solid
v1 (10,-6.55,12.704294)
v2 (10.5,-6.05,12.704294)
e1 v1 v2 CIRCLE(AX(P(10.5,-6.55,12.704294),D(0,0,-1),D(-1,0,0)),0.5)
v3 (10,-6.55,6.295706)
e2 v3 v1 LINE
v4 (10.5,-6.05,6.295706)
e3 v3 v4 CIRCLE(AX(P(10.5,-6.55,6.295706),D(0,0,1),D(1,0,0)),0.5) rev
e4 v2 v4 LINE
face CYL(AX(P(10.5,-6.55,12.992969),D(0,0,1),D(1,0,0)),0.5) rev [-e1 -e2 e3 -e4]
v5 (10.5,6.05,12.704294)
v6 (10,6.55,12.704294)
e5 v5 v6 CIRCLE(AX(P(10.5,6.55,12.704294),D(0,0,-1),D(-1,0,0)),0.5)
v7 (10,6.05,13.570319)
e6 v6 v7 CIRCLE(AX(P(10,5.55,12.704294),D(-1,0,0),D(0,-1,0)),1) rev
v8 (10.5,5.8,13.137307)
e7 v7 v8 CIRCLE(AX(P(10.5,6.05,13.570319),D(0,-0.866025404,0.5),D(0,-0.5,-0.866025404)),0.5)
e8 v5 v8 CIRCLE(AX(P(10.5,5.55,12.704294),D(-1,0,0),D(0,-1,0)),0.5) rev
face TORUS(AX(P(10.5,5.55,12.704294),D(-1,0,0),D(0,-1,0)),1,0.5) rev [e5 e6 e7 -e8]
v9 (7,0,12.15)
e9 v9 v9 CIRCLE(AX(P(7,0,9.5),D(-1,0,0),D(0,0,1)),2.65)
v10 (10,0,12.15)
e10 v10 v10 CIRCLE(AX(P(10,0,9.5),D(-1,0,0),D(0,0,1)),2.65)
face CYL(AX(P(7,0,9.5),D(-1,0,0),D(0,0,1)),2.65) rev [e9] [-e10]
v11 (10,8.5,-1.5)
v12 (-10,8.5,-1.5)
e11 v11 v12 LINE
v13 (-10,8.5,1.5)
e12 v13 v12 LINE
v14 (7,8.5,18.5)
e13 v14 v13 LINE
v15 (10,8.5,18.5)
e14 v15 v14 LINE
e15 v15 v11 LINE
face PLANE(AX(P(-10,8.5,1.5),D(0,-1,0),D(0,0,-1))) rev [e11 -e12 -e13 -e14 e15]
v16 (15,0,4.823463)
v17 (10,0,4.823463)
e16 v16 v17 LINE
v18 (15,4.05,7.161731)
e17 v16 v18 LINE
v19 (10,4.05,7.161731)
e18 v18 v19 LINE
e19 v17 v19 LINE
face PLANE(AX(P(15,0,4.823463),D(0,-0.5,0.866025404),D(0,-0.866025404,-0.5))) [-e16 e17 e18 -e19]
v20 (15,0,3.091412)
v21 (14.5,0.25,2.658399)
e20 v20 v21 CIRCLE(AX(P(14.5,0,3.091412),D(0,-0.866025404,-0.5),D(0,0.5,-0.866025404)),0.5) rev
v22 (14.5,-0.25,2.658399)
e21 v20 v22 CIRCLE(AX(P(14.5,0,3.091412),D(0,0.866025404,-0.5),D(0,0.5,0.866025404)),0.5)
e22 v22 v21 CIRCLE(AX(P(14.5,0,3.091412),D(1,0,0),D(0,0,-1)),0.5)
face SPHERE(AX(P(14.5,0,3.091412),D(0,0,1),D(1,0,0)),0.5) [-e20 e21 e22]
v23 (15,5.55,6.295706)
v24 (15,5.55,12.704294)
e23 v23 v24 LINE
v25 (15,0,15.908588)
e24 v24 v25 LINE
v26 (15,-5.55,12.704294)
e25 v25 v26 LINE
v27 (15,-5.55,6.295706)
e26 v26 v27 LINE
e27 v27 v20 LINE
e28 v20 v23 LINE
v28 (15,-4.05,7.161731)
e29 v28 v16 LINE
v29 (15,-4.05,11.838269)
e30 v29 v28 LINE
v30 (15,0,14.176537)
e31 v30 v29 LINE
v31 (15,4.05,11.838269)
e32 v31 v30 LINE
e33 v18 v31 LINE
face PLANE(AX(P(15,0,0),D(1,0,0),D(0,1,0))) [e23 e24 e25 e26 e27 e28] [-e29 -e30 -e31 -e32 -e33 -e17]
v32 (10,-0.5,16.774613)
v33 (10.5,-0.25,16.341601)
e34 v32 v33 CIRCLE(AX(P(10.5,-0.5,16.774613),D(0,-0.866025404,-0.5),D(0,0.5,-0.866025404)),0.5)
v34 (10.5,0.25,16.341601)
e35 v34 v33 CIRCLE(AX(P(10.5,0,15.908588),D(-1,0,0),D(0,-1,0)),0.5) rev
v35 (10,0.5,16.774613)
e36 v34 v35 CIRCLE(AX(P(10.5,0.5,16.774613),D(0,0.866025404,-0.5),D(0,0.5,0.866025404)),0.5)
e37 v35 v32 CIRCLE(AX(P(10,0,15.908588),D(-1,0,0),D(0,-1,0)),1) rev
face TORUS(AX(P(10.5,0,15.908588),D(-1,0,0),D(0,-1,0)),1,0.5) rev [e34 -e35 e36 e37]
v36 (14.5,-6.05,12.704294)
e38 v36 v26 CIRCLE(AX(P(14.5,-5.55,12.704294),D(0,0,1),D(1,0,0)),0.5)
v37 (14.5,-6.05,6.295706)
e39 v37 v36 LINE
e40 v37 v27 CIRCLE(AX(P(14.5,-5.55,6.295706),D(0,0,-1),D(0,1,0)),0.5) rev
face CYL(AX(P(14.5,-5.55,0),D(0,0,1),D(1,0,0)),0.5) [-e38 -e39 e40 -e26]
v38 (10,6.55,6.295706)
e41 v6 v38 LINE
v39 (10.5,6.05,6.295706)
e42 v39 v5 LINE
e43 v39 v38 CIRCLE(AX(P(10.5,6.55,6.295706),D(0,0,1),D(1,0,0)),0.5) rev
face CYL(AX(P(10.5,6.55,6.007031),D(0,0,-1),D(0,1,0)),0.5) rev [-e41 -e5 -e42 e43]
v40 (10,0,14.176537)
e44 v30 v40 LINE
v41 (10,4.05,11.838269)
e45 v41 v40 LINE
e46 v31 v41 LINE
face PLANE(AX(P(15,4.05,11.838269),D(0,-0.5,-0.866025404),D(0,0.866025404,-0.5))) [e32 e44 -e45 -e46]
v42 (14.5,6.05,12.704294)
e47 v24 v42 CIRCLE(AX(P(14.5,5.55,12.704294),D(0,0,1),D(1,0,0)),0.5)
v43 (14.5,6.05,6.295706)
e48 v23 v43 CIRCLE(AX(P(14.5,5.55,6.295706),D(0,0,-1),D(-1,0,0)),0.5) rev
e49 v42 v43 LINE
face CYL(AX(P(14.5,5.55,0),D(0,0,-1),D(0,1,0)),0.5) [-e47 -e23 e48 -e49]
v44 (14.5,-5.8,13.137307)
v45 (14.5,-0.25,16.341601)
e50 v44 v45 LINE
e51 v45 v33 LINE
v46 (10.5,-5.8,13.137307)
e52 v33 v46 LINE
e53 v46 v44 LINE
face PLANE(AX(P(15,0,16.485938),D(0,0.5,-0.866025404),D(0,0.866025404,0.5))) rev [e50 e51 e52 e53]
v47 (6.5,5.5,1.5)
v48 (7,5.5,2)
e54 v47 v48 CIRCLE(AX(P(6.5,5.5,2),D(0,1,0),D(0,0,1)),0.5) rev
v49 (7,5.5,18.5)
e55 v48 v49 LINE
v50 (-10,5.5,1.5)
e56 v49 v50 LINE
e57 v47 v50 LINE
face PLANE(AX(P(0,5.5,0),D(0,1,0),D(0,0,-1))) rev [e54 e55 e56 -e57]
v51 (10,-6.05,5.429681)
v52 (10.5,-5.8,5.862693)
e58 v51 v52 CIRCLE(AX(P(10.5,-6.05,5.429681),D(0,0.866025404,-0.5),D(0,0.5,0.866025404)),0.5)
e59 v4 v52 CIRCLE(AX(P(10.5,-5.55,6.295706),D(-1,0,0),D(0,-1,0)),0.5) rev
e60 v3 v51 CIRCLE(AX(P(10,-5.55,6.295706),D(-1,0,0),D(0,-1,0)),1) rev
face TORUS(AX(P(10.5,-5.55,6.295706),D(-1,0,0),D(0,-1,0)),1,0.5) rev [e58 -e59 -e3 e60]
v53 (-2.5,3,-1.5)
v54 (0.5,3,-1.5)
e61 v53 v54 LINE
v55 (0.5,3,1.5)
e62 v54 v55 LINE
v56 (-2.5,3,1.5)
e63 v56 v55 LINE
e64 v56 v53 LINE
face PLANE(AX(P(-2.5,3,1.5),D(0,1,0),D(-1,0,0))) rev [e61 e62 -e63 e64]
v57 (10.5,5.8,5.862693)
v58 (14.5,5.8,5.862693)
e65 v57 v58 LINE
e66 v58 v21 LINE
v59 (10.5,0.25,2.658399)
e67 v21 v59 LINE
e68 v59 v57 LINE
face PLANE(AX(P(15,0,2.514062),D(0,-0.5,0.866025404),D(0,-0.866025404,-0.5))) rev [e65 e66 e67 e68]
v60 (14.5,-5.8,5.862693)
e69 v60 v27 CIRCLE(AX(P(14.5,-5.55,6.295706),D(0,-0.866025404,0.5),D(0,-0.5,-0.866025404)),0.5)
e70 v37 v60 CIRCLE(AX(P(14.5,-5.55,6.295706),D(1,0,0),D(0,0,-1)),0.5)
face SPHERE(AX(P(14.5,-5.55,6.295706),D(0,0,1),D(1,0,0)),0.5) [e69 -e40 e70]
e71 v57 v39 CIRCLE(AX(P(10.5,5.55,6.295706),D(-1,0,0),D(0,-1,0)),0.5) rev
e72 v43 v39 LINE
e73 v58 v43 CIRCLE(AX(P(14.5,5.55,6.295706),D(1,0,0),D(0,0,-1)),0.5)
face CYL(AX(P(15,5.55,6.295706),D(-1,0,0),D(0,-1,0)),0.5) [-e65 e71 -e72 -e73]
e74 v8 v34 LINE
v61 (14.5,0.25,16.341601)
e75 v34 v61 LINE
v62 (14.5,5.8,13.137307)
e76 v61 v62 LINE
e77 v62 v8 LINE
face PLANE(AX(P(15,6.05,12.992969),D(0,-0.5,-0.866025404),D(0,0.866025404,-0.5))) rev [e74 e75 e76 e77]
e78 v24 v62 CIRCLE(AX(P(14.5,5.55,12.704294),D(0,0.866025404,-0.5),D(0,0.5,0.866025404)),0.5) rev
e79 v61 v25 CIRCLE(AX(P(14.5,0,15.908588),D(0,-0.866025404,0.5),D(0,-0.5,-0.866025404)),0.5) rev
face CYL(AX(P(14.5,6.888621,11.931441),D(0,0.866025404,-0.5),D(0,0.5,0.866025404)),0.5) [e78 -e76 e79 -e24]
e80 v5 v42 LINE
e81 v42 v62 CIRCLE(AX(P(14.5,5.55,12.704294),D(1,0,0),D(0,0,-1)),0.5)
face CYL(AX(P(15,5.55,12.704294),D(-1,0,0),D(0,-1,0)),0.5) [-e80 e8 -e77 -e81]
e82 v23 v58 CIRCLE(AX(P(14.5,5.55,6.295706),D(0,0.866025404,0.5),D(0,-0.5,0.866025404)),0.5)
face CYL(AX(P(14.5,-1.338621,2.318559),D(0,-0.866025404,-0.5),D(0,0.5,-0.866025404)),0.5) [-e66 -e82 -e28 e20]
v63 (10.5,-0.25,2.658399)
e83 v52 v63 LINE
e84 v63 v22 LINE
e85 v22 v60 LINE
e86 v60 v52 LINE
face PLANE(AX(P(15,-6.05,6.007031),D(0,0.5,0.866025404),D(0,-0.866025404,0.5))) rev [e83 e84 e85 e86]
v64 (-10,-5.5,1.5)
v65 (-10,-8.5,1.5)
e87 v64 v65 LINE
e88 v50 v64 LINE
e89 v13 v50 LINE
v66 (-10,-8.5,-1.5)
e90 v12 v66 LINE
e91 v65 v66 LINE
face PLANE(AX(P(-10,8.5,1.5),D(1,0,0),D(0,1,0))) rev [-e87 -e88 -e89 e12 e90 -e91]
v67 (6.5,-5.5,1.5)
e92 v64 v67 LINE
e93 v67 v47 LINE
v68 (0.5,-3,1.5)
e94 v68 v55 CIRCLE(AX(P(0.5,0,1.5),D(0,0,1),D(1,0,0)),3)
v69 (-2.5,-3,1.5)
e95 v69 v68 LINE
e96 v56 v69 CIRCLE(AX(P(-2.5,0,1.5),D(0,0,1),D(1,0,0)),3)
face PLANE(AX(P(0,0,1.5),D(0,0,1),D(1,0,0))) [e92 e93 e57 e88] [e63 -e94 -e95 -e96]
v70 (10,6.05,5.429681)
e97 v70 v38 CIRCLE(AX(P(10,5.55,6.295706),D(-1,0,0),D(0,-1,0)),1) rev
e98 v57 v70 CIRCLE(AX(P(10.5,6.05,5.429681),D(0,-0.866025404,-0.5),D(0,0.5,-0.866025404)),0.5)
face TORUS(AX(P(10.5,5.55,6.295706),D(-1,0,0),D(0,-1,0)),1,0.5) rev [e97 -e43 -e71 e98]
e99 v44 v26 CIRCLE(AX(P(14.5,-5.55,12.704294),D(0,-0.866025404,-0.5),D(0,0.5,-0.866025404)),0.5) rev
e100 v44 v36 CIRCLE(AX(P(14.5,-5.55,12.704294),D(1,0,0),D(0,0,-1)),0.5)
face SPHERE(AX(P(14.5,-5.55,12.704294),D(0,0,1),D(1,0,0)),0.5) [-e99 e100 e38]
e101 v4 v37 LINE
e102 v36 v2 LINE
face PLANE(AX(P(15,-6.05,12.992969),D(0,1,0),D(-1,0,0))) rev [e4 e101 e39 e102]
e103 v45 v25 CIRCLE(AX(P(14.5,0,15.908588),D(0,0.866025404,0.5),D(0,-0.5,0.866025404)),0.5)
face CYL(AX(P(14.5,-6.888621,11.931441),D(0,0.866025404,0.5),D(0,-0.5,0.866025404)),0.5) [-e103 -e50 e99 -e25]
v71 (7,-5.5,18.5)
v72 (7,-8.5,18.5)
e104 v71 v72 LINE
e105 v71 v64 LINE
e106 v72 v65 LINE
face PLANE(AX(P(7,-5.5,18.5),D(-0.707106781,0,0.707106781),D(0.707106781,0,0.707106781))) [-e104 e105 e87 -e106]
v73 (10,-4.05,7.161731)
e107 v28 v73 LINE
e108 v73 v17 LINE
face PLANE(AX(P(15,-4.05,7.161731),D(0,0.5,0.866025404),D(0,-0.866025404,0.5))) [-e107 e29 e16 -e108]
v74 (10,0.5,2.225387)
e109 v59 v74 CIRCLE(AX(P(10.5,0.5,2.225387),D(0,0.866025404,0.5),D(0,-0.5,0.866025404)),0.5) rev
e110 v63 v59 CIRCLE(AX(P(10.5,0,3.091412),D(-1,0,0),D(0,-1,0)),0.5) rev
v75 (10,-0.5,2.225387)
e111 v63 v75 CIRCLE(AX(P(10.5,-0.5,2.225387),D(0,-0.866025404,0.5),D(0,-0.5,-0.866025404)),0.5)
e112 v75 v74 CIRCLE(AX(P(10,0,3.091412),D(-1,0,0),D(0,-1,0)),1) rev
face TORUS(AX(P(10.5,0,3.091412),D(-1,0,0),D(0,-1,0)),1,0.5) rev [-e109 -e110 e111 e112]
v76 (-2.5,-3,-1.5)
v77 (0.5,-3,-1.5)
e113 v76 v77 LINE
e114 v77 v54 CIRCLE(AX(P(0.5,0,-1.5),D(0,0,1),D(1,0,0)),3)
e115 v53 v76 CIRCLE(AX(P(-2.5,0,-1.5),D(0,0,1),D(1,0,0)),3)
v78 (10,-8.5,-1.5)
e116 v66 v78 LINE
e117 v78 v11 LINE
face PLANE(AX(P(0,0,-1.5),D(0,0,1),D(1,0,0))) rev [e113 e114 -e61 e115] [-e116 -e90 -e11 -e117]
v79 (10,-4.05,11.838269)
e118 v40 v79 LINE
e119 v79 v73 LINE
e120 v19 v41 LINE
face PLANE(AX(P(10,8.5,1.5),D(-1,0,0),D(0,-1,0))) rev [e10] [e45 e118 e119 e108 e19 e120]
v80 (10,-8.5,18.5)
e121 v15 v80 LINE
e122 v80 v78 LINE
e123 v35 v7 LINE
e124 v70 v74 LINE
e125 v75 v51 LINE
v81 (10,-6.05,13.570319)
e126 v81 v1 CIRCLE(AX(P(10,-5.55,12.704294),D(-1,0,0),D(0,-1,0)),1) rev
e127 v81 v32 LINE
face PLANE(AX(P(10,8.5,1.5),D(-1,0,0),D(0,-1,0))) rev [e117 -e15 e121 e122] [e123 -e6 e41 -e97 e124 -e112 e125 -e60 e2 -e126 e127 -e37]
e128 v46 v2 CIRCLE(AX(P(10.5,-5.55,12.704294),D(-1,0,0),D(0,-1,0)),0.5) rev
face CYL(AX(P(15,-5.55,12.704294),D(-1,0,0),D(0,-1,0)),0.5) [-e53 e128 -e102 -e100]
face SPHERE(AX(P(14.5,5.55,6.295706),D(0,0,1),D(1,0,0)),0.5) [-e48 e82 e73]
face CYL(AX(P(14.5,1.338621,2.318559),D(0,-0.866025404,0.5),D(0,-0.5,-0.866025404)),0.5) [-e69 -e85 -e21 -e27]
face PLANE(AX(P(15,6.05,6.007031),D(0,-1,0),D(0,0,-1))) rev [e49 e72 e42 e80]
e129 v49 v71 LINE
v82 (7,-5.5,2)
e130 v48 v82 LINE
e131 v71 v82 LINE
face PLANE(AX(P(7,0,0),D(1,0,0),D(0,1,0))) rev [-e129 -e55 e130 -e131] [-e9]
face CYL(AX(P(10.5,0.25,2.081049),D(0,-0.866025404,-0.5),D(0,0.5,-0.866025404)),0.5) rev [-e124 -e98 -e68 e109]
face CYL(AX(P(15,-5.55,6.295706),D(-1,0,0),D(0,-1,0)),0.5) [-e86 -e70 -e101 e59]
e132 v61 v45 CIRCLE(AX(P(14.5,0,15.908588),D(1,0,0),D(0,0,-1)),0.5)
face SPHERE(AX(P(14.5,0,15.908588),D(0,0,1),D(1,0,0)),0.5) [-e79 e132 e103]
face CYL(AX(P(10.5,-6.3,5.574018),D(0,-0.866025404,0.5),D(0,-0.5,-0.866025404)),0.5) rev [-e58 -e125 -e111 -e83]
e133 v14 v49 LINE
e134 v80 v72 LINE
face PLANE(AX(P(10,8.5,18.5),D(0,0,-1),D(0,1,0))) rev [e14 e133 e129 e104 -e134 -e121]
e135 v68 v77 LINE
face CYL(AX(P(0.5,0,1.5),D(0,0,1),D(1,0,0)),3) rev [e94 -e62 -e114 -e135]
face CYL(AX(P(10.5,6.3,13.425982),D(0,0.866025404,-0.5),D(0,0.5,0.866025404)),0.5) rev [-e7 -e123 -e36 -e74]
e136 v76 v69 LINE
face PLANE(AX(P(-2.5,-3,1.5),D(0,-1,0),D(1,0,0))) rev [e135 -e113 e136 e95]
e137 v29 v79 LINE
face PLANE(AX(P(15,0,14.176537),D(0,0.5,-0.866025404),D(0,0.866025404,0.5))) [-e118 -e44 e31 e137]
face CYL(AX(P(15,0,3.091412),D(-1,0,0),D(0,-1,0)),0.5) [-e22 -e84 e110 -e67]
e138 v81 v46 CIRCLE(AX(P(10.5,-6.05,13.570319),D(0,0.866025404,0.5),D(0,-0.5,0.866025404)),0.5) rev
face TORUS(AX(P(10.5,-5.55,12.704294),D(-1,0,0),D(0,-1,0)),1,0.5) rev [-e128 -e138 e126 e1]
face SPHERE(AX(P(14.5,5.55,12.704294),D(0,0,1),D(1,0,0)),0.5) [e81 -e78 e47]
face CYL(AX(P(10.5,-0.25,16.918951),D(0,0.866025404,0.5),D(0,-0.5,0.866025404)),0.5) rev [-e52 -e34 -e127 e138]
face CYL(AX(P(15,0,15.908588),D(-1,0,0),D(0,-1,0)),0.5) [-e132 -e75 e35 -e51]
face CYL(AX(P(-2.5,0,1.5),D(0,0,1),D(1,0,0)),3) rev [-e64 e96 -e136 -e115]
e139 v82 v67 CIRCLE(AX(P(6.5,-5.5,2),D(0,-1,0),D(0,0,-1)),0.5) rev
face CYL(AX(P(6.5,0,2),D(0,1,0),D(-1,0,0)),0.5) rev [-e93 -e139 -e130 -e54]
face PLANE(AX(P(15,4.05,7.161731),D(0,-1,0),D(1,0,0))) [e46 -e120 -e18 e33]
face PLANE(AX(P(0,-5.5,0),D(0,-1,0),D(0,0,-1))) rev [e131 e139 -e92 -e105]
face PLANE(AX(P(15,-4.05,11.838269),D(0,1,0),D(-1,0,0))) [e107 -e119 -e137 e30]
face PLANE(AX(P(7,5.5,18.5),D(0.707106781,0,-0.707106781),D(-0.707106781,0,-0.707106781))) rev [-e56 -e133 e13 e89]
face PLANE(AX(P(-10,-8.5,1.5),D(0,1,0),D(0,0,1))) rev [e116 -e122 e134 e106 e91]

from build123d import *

# Parameters (mm, degrees)
CROQUIS2_W                      = 20
CROQUIS2_H                      = 17
SALIENTE_EXTRUIR1_DEPTH         = 1.5
CROQUIS3_W                      = 20
CROQUIS3_H                      = 17
SALIENTE_EXTRUIR2_DEPTH         = 3
RANURA_START                    = -1.5
RANURA_DE_MARGEN_PARA_M65_DEPTH = 3
REDONDEO1_R                     = 0.5
SALIENTE_EXTRUIR3_DEPTH         = 3
TALADRO_DE_MARGEN_PARA_M51_D    = 5.3
SALIENTE_EXTRUIR4_DEPTH         = 5
REDONDEO2_R                     = 0.5


# Read off the part's stored shape, not the designer's step: Ranura de margen para M65
with BuildPart() as part:
    # Croquis2 → Saliente-Extruir1 (new, symmetric)
    with BuildSketch(Plane.XY):
        Rectangle(CROQUIS2_W, CROQUIS2_H)
    extrude(amount=SALIENTE_EXTRUIR1_DEPTH, both=True)

    # Croquis3 → Saliente-Extruir2 (add)
    with BuildSketch(Plane(origin=(7, 0, 0), x_dir=(0, 0, -1), z_dir=(1, 0, 0))):
        with Locations((-8.5, 0)):
            Rectangle(CROQUIS3_W, CROQUIS3_H)
    extrude(amount=SALIENTE_EXTRUIR2_DEPTH)

    # Ranura de margen para M65 outline → Ranura de margen para M65 (cut)
    with BuildSketch(Plane.XY.offset(RANURA_START)):
        with BuildLine():
            Line((-2.5, -3), (0.5, -3))
            ThreePointArc((0.5, -3), (3.5, 0), (0.5, 3))
            Line((0.5, 3), (-2.5, 3))
            ThreePointArc((-2.5, 3), (-5.5, 0), (-2.5, -3))
        make_face()
    extrude(amount=RANURA_DE_MARGEN_PARA_M65_DEPTH, mode=Mode.SUBTRACT)

    # Redondeo1
    redondeo1_edges = [part.edges().sort_by_distance(p)[0] for p in [
        (7, 0, 1.5),
    ]]
    fillet(redondeo1_edges, radius=REDONDEO1_R)

    # Croquis9 → Saliente-Extruir3 (add)
    with BuildSketch(Plane.XZ.offset(8.5)):
        Polygon((7, 18.5), (-10, 1.5), (-10, -1.5), (10, -1.5), (10, 18.5), align=None)
    saliente_extruir3 = extrude(amount=-SALIENTE_EXTRUIR3_DEPTH)

    # Simetría2: Saliente-Extruir3 across plane
    add(saliente_extruir3.mirror(Plane.ZX))

    # Taladro de margen para M51 (through all)
    with Locations(Plane.ZY.offset(-7)):
        with Locations((9.5, 0)):
            Hole(TALADRO_DE_MARGEN_PARA_M51_D / 2)

    # Croquis12 → Saliente-Extruir4 (add)
    with BuildSketch(Plane(origin=(10, 0, 0), x_dir=(0, 0, -1), z_dir=(1, 0, 0))):
        Polygon((-6.007030871, -6.05), (-2.514061743, 0), (-6.007030871, 6.05), (-12.992969129, 6.05), (-16.485938257, 0), (-12.992969129, -6.05), align=None)
        Polygon((-7.16173141, -4.05), (-4.82346282, 0), (-7.16173141, 4.05), (-11.83826859, 4.05), (-14.17653718, 0), (-11.83826859, -4.05), align=None, mode=Mode.SUBTRACT)
    extrude(amount=SALIENTE_EXTRUIR4_DEPTH)

    # Redondeo2
    redondeo2_edges = [part.edges().sort_by_distance(p)[0] for p in [
        (15, -6.05, 9.5),
        (15, -3.025, 4.260546307),
        (15, 3.025, 4.260546307),
        (15, 6.05, 9.5),
        (15, 3.025, 14.739453693),
        (15, -3.025, 14.739453693),
        (10, -6.05, 9.5),
        (12.5, -6.05, 12.992969129),
        (10, -3.025, 4.260546307),
        (12.5, -6.05, 6.007030871),
        (10, 3.025, 4.260546307),
        (12.5, 0, 2.514061743),
        (10, 6.05, 9.5),
        (12.5, 6.05, 6.007030871),
        (10, 3.025, 14.739453693),
        (12.5, 6.05, 12.992969129),
        (10, -3.025, 14.739453693),
        (12.5, 0, 16.485938257),
    ]]
    fillet(redondeo2_edges, radius=REDONDEO2_R)


solid = part.part
